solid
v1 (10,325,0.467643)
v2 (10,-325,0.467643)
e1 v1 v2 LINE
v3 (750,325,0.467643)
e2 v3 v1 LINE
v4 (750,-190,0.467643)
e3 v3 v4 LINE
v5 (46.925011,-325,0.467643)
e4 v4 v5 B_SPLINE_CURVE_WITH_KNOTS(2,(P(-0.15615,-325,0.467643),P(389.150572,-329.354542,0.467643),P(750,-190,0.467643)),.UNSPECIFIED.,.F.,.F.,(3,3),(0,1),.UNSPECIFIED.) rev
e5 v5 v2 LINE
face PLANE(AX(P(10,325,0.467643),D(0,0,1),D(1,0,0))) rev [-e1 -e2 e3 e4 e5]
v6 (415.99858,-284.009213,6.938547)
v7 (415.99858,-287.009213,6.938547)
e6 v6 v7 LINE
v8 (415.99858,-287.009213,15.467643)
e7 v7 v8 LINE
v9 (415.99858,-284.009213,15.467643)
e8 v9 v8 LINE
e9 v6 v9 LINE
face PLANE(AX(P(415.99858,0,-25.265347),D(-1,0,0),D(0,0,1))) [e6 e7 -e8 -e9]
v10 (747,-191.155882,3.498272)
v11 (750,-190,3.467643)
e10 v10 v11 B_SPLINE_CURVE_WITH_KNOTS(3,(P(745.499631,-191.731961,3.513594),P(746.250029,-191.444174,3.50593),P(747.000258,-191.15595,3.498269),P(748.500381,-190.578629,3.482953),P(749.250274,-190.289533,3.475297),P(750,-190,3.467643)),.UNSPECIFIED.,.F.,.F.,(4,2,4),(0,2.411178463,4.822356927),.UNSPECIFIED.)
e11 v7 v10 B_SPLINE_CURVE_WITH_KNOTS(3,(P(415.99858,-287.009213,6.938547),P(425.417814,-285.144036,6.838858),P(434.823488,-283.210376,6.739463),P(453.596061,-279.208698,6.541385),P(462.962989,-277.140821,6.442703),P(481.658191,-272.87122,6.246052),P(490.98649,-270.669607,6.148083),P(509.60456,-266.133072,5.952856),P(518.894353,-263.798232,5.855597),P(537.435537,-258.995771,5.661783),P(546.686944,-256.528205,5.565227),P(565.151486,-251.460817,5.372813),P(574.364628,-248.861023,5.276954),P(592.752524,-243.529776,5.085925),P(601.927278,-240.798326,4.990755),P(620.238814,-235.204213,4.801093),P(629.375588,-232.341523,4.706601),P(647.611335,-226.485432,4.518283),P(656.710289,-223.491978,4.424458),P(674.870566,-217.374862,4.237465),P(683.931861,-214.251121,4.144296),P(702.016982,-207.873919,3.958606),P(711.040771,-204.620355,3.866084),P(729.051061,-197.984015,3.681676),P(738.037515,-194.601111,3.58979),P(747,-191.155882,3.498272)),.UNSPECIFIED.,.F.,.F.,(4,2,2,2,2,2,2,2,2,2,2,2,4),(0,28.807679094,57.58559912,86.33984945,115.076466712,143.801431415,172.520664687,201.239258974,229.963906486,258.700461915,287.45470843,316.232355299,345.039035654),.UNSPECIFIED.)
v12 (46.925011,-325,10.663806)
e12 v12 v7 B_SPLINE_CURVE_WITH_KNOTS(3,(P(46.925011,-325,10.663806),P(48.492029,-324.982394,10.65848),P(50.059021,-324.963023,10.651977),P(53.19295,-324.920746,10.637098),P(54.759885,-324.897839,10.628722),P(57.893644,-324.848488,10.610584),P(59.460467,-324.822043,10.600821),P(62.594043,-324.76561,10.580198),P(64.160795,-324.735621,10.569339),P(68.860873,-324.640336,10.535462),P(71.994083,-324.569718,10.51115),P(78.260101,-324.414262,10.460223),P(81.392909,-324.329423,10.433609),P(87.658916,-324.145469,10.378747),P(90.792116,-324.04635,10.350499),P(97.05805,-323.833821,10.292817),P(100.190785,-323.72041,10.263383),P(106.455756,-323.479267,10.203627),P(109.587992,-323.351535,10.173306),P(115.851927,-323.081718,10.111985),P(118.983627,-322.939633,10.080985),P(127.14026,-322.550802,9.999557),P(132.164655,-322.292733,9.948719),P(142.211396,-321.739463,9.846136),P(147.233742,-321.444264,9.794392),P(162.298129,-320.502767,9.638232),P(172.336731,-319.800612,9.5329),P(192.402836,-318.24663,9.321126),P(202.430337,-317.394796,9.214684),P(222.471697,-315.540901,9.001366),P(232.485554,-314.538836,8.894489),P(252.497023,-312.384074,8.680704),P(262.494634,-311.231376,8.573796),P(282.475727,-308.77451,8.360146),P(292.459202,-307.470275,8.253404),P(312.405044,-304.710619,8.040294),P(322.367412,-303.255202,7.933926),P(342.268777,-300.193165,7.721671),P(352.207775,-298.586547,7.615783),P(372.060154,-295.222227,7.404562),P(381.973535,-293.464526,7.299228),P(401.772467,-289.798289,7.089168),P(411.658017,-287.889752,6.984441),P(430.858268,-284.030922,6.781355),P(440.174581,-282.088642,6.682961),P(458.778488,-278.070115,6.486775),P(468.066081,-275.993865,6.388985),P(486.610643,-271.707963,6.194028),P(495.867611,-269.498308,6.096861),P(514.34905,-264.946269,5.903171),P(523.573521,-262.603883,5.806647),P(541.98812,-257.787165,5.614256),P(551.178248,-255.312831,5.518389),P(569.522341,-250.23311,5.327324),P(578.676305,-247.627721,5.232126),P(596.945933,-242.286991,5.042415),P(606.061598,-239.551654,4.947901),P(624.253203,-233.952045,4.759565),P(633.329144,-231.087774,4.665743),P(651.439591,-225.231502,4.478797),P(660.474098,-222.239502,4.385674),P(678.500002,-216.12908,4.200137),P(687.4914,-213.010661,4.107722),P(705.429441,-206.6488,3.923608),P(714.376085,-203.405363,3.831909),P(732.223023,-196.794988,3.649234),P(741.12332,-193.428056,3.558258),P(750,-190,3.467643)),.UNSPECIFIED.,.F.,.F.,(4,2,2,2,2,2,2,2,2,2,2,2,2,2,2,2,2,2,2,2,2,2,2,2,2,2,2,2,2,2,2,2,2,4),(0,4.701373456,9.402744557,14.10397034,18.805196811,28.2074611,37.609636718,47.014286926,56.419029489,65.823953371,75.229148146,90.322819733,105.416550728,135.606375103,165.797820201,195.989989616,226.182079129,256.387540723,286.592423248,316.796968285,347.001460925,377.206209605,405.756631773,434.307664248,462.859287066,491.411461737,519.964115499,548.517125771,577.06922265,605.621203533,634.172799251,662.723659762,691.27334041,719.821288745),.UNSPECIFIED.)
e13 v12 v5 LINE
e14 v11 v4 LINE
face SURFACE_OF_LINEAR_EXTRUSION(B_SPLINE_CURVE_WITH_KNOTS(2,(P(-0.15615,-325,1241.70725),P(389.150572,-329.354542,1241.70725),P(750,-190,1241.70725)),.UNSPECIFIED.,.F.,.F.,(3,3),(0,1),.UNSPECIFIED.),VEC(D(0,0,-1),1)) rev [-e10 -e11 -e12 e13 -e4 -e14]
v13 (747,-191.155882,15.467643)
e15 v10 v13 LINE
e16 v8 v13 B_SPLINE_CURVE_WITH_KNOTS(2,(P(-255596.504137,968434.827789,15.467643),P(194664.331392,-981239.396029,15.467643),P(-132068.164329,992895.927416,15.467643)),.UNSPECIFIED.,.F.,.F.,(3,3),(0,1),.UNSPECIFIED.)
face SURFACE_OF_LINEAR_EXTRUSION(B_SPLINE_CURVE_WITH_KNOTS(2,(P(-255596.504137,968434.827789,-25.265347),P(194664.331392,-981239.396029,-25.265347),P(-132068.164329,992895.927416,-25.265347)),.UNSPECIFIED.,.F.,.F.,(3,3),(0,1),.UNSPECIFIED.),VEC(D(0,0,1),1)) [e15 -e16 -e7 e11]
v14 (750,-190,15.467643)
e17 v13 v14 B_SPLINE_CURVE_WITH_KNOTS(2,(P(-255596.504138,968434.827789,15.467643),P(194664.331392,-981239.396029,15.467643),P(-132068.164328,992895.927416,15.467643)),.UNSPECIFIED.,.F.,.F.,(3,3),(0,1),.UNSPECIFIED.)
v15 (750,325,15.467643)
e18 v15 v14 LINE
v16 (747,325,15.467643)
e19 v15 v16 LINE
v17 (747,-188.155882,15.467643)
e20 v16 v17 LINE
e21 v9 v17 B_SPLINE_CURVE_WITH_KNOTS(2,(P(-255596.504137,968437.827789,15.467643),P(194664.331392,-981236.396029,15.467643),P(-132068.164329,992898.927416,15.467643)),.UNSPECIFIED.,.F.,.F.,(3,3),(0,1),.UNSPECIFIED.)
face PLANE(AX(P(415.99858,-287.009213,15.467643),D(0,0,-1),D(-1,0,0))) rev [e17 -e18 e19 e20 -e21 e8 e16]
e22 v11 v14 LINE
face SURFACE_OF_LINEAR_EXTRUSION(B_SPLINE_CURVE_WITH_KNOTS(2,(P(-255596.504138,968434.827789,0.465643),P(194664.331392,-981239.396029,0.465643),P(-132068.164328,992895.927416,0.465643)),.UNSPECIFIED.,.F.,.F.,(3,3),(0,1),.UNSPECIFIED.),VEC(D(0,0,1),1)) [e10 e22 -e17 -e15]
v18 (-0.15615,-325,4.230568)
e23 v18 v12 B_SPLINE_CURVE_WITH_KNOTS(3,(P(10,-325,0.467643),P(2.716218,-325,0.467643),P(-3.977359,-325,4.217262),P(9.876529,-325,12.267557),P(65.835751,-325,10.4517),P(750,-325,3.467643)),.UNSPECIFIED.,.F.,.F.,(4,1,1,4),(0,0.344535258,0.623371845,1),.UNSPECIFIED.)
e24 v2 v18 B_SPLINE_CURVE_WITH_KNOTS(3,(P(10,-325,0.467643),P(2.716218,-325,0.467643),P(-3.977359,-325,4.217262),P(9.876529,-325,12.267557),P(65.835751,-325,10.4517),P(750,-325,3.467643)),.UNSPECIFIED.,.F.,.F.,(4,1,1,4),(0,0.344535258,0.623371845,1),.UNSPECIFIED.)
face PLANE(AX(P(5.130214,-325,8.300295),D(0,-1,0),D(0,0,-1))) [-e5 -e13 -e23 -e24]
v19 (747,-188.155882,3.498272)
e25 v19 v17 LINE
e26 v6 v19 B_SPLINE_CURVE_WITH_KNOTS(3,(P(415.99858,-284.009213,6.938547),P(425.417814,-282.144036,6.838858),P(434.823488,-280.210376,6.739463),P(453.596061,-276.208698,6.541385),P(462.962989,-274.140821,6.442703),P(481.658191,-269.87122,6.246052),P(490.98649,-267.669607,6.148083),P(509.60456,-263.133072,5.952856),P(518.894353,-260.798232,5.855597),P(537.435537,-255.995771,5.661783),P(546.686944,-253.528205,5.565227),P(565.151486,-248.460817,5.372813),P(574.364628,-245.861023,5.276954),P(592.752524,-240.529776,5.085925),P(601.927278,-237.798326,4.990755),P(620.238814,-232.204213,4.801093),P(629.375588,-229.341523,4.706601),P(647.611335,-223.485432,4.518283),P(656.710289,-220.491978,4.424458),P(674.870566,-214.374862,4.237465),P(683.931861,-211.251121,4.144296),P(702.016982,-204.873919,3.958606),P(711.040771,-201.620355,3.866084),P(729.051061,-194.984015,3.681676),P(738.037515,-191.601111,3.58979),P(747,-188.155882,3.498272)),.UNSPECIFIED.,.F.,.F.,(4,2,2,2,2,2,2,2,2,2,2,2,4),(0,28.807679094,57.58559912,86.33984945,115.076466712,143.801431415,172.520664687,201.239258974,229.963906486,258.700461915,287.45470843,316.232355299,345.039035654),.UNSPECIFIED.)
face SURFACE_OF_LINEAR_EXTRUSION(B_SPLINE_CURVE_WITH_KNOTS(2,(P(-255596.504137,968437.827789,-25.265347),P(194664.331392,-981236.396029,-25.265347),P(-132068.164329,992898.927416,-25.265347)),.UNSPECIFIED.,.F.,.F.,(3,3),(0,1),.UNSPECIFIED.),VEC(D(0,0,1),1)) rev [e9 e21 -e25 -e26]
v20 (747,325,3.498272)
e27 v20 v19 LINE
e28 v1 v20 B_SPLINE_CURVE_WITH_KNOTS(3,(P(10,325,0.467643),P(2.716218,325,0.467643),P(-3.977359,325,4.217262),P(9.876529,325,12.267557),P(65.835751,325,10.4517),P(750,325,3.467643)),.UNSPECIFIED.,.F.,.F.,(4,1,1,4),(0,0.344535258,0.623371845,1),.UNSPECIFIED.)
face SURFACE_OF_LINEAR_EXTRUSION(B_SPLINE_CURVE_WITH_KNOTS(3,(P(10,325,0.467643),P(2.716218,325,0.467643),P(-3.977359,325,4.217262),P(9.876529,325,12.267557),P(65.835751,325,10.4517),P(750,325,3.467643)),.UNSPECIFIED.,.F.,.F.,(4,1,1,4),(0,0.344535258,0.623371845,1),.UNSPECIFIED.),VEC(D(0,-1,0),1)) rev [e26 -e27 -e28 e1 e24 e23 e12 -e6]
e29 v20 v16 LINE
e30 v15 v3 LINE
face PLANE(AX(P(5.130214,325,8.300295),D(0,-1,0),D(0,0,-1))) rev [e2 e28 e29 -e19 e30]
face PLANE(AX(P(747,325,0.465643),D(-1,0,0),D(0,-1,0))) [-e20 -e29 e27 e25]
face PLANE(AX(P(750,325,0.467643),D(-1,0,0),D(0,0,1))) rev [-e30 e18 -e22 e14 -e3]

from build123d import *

# Parameters (mm, degrees)
EXTRUDE_1_DEPTH     = 325
CUT_EXTRUDE_START   = 0.467643307
CUT_EXTRUDE_1_DEPTH = 10.196163133
EXTRUDE_2_REACH     = 819.527
EXTRUDE_3_REACH     = 819.527


# Read off the part's stored shape, not the designer's step: 切除-拉伸1
with BuildPart() as part:
    # 草图1 → 凸台-拉伸1 (new, symmetric)
    with BuildSketch(Plane(origin=(0, 0, 0), x_dir=(1, 0, 0), z_dir=(0, 1, 0))):
        with BuildLine():
            Line((10, -0.467643307), (750, -0.467643307))
            Line((750, -0.467643307), (750, -3.467643307))
            add(Edge.make_bspline(
                [(10, -0.467643307), (2.716217609, -0.467643307), (-3.977358646, -4.217262467), (9.876528594, -12.267556836), (65.835750945, -10.451699609), (750, -3.467643307)],
                knots=[0, 0, 0, 0, 0.344535258, 0.623371845, 1, 1, 1, 1], degree=3))
        make_face()
    extrude(amount=EXTRUDE_1_DEPTH, both=True)

    # 切除-拉伸1 outline → 切除-拉伸1 (cut)
    with BuildSketch(Plane.XY.offset(CUT_EXTRUDE_START)):
        with BuildLine():
            add(Edge.make_bspline(
                [(46.925011271, -325), (411.018834777, -320.909352671), (750, -190)],
                knots=[0.060602183, 0.060602183, 0.060602183, 1, 1, 1], degree=2))
            Line((46.925011271, -325), (750, -325))
            Line((750, -325), (750, -190))
        make_face()
    extrude(amount=CUT_EXTRUDE_1_DEPTH, mode=Mode.SUBTRACT)

    # 草图3 → 凸台-拉伸2 (add, up to next)
    with BuildSketch(Plane(origin=(0, 0, 15.467643307), x_dir=(-1, 0, 0), z_dir=(0, 0, -1)), mode=Mode.PRIVATE) as extrude_2_sk1:
        with BuildLine():
            Line((-750, 325), (-750, -190))
            add(Edge.make_bspline(
                [(-747, -191.155881977), (-748.500245783, -190.57918219), (-750, -190)],
                knots=[0, 0, 0, 1, 1, 1], degree=2))
            Line((-747, -191.155881977), (-747, 325))
            Line((-747, 325), (-750, 325))
        make_face()
    extrude_2_tool1 = extrude(extrude_2_sk1.sketch, amount=EXTRUDE_2_REACH, mode=Mode.PRIVATE) - part.part
    add(extrude_2_tool1.solids().sort_by_distance((748.49944, 67.210699, 15.467643))[0])

    # 草图4 → 凸台-拉伸3 (add, up to next)
    with BuildSketch(Plane(origin=(0, 0, 15.467643307), x_dir=(-1, 0, 0), z_dir=(0, 0, -1)), mode=Mode.PRIVATE) as extrude_3_sk1:
        with BuildLine():
            Line((-415.998579589, -287.009213098), (-415.998579589, -284.009213098))
            add(Edge.make_bspline(
                [(-415.998579589, -284.009213098), (-584.386896167, -250.664934415), (-747.000000045, -188.15588196)],
                knots=[0.518314736, 0.518314736, 0.518314736, 1, 1, 1], degree=2))
            Line((-747.000000045, -188.15588196), (-747.000000045, -191.15588196))
            add(Edge.make_bspline(
                [(-415.998579589, -287.009213098), (-584.386896167, -253.664934415), (-747.000000045, -191.15588196)],
                knots=[0.518314736, 0.518314736, 0.518314736, 1, 1, 1], degree=2))
        make_face()
    extrude_3_tool1 = extrude(extrude_3_sk1.sketch, amount=EXTRUDE_3_REACH, mode=Mode.PRIVATE) - part.part
    add(extrude_3_tool1.solids().sort_by_distance((583.461704, -245.863812, 15.467643))[0])


solid = part.part
